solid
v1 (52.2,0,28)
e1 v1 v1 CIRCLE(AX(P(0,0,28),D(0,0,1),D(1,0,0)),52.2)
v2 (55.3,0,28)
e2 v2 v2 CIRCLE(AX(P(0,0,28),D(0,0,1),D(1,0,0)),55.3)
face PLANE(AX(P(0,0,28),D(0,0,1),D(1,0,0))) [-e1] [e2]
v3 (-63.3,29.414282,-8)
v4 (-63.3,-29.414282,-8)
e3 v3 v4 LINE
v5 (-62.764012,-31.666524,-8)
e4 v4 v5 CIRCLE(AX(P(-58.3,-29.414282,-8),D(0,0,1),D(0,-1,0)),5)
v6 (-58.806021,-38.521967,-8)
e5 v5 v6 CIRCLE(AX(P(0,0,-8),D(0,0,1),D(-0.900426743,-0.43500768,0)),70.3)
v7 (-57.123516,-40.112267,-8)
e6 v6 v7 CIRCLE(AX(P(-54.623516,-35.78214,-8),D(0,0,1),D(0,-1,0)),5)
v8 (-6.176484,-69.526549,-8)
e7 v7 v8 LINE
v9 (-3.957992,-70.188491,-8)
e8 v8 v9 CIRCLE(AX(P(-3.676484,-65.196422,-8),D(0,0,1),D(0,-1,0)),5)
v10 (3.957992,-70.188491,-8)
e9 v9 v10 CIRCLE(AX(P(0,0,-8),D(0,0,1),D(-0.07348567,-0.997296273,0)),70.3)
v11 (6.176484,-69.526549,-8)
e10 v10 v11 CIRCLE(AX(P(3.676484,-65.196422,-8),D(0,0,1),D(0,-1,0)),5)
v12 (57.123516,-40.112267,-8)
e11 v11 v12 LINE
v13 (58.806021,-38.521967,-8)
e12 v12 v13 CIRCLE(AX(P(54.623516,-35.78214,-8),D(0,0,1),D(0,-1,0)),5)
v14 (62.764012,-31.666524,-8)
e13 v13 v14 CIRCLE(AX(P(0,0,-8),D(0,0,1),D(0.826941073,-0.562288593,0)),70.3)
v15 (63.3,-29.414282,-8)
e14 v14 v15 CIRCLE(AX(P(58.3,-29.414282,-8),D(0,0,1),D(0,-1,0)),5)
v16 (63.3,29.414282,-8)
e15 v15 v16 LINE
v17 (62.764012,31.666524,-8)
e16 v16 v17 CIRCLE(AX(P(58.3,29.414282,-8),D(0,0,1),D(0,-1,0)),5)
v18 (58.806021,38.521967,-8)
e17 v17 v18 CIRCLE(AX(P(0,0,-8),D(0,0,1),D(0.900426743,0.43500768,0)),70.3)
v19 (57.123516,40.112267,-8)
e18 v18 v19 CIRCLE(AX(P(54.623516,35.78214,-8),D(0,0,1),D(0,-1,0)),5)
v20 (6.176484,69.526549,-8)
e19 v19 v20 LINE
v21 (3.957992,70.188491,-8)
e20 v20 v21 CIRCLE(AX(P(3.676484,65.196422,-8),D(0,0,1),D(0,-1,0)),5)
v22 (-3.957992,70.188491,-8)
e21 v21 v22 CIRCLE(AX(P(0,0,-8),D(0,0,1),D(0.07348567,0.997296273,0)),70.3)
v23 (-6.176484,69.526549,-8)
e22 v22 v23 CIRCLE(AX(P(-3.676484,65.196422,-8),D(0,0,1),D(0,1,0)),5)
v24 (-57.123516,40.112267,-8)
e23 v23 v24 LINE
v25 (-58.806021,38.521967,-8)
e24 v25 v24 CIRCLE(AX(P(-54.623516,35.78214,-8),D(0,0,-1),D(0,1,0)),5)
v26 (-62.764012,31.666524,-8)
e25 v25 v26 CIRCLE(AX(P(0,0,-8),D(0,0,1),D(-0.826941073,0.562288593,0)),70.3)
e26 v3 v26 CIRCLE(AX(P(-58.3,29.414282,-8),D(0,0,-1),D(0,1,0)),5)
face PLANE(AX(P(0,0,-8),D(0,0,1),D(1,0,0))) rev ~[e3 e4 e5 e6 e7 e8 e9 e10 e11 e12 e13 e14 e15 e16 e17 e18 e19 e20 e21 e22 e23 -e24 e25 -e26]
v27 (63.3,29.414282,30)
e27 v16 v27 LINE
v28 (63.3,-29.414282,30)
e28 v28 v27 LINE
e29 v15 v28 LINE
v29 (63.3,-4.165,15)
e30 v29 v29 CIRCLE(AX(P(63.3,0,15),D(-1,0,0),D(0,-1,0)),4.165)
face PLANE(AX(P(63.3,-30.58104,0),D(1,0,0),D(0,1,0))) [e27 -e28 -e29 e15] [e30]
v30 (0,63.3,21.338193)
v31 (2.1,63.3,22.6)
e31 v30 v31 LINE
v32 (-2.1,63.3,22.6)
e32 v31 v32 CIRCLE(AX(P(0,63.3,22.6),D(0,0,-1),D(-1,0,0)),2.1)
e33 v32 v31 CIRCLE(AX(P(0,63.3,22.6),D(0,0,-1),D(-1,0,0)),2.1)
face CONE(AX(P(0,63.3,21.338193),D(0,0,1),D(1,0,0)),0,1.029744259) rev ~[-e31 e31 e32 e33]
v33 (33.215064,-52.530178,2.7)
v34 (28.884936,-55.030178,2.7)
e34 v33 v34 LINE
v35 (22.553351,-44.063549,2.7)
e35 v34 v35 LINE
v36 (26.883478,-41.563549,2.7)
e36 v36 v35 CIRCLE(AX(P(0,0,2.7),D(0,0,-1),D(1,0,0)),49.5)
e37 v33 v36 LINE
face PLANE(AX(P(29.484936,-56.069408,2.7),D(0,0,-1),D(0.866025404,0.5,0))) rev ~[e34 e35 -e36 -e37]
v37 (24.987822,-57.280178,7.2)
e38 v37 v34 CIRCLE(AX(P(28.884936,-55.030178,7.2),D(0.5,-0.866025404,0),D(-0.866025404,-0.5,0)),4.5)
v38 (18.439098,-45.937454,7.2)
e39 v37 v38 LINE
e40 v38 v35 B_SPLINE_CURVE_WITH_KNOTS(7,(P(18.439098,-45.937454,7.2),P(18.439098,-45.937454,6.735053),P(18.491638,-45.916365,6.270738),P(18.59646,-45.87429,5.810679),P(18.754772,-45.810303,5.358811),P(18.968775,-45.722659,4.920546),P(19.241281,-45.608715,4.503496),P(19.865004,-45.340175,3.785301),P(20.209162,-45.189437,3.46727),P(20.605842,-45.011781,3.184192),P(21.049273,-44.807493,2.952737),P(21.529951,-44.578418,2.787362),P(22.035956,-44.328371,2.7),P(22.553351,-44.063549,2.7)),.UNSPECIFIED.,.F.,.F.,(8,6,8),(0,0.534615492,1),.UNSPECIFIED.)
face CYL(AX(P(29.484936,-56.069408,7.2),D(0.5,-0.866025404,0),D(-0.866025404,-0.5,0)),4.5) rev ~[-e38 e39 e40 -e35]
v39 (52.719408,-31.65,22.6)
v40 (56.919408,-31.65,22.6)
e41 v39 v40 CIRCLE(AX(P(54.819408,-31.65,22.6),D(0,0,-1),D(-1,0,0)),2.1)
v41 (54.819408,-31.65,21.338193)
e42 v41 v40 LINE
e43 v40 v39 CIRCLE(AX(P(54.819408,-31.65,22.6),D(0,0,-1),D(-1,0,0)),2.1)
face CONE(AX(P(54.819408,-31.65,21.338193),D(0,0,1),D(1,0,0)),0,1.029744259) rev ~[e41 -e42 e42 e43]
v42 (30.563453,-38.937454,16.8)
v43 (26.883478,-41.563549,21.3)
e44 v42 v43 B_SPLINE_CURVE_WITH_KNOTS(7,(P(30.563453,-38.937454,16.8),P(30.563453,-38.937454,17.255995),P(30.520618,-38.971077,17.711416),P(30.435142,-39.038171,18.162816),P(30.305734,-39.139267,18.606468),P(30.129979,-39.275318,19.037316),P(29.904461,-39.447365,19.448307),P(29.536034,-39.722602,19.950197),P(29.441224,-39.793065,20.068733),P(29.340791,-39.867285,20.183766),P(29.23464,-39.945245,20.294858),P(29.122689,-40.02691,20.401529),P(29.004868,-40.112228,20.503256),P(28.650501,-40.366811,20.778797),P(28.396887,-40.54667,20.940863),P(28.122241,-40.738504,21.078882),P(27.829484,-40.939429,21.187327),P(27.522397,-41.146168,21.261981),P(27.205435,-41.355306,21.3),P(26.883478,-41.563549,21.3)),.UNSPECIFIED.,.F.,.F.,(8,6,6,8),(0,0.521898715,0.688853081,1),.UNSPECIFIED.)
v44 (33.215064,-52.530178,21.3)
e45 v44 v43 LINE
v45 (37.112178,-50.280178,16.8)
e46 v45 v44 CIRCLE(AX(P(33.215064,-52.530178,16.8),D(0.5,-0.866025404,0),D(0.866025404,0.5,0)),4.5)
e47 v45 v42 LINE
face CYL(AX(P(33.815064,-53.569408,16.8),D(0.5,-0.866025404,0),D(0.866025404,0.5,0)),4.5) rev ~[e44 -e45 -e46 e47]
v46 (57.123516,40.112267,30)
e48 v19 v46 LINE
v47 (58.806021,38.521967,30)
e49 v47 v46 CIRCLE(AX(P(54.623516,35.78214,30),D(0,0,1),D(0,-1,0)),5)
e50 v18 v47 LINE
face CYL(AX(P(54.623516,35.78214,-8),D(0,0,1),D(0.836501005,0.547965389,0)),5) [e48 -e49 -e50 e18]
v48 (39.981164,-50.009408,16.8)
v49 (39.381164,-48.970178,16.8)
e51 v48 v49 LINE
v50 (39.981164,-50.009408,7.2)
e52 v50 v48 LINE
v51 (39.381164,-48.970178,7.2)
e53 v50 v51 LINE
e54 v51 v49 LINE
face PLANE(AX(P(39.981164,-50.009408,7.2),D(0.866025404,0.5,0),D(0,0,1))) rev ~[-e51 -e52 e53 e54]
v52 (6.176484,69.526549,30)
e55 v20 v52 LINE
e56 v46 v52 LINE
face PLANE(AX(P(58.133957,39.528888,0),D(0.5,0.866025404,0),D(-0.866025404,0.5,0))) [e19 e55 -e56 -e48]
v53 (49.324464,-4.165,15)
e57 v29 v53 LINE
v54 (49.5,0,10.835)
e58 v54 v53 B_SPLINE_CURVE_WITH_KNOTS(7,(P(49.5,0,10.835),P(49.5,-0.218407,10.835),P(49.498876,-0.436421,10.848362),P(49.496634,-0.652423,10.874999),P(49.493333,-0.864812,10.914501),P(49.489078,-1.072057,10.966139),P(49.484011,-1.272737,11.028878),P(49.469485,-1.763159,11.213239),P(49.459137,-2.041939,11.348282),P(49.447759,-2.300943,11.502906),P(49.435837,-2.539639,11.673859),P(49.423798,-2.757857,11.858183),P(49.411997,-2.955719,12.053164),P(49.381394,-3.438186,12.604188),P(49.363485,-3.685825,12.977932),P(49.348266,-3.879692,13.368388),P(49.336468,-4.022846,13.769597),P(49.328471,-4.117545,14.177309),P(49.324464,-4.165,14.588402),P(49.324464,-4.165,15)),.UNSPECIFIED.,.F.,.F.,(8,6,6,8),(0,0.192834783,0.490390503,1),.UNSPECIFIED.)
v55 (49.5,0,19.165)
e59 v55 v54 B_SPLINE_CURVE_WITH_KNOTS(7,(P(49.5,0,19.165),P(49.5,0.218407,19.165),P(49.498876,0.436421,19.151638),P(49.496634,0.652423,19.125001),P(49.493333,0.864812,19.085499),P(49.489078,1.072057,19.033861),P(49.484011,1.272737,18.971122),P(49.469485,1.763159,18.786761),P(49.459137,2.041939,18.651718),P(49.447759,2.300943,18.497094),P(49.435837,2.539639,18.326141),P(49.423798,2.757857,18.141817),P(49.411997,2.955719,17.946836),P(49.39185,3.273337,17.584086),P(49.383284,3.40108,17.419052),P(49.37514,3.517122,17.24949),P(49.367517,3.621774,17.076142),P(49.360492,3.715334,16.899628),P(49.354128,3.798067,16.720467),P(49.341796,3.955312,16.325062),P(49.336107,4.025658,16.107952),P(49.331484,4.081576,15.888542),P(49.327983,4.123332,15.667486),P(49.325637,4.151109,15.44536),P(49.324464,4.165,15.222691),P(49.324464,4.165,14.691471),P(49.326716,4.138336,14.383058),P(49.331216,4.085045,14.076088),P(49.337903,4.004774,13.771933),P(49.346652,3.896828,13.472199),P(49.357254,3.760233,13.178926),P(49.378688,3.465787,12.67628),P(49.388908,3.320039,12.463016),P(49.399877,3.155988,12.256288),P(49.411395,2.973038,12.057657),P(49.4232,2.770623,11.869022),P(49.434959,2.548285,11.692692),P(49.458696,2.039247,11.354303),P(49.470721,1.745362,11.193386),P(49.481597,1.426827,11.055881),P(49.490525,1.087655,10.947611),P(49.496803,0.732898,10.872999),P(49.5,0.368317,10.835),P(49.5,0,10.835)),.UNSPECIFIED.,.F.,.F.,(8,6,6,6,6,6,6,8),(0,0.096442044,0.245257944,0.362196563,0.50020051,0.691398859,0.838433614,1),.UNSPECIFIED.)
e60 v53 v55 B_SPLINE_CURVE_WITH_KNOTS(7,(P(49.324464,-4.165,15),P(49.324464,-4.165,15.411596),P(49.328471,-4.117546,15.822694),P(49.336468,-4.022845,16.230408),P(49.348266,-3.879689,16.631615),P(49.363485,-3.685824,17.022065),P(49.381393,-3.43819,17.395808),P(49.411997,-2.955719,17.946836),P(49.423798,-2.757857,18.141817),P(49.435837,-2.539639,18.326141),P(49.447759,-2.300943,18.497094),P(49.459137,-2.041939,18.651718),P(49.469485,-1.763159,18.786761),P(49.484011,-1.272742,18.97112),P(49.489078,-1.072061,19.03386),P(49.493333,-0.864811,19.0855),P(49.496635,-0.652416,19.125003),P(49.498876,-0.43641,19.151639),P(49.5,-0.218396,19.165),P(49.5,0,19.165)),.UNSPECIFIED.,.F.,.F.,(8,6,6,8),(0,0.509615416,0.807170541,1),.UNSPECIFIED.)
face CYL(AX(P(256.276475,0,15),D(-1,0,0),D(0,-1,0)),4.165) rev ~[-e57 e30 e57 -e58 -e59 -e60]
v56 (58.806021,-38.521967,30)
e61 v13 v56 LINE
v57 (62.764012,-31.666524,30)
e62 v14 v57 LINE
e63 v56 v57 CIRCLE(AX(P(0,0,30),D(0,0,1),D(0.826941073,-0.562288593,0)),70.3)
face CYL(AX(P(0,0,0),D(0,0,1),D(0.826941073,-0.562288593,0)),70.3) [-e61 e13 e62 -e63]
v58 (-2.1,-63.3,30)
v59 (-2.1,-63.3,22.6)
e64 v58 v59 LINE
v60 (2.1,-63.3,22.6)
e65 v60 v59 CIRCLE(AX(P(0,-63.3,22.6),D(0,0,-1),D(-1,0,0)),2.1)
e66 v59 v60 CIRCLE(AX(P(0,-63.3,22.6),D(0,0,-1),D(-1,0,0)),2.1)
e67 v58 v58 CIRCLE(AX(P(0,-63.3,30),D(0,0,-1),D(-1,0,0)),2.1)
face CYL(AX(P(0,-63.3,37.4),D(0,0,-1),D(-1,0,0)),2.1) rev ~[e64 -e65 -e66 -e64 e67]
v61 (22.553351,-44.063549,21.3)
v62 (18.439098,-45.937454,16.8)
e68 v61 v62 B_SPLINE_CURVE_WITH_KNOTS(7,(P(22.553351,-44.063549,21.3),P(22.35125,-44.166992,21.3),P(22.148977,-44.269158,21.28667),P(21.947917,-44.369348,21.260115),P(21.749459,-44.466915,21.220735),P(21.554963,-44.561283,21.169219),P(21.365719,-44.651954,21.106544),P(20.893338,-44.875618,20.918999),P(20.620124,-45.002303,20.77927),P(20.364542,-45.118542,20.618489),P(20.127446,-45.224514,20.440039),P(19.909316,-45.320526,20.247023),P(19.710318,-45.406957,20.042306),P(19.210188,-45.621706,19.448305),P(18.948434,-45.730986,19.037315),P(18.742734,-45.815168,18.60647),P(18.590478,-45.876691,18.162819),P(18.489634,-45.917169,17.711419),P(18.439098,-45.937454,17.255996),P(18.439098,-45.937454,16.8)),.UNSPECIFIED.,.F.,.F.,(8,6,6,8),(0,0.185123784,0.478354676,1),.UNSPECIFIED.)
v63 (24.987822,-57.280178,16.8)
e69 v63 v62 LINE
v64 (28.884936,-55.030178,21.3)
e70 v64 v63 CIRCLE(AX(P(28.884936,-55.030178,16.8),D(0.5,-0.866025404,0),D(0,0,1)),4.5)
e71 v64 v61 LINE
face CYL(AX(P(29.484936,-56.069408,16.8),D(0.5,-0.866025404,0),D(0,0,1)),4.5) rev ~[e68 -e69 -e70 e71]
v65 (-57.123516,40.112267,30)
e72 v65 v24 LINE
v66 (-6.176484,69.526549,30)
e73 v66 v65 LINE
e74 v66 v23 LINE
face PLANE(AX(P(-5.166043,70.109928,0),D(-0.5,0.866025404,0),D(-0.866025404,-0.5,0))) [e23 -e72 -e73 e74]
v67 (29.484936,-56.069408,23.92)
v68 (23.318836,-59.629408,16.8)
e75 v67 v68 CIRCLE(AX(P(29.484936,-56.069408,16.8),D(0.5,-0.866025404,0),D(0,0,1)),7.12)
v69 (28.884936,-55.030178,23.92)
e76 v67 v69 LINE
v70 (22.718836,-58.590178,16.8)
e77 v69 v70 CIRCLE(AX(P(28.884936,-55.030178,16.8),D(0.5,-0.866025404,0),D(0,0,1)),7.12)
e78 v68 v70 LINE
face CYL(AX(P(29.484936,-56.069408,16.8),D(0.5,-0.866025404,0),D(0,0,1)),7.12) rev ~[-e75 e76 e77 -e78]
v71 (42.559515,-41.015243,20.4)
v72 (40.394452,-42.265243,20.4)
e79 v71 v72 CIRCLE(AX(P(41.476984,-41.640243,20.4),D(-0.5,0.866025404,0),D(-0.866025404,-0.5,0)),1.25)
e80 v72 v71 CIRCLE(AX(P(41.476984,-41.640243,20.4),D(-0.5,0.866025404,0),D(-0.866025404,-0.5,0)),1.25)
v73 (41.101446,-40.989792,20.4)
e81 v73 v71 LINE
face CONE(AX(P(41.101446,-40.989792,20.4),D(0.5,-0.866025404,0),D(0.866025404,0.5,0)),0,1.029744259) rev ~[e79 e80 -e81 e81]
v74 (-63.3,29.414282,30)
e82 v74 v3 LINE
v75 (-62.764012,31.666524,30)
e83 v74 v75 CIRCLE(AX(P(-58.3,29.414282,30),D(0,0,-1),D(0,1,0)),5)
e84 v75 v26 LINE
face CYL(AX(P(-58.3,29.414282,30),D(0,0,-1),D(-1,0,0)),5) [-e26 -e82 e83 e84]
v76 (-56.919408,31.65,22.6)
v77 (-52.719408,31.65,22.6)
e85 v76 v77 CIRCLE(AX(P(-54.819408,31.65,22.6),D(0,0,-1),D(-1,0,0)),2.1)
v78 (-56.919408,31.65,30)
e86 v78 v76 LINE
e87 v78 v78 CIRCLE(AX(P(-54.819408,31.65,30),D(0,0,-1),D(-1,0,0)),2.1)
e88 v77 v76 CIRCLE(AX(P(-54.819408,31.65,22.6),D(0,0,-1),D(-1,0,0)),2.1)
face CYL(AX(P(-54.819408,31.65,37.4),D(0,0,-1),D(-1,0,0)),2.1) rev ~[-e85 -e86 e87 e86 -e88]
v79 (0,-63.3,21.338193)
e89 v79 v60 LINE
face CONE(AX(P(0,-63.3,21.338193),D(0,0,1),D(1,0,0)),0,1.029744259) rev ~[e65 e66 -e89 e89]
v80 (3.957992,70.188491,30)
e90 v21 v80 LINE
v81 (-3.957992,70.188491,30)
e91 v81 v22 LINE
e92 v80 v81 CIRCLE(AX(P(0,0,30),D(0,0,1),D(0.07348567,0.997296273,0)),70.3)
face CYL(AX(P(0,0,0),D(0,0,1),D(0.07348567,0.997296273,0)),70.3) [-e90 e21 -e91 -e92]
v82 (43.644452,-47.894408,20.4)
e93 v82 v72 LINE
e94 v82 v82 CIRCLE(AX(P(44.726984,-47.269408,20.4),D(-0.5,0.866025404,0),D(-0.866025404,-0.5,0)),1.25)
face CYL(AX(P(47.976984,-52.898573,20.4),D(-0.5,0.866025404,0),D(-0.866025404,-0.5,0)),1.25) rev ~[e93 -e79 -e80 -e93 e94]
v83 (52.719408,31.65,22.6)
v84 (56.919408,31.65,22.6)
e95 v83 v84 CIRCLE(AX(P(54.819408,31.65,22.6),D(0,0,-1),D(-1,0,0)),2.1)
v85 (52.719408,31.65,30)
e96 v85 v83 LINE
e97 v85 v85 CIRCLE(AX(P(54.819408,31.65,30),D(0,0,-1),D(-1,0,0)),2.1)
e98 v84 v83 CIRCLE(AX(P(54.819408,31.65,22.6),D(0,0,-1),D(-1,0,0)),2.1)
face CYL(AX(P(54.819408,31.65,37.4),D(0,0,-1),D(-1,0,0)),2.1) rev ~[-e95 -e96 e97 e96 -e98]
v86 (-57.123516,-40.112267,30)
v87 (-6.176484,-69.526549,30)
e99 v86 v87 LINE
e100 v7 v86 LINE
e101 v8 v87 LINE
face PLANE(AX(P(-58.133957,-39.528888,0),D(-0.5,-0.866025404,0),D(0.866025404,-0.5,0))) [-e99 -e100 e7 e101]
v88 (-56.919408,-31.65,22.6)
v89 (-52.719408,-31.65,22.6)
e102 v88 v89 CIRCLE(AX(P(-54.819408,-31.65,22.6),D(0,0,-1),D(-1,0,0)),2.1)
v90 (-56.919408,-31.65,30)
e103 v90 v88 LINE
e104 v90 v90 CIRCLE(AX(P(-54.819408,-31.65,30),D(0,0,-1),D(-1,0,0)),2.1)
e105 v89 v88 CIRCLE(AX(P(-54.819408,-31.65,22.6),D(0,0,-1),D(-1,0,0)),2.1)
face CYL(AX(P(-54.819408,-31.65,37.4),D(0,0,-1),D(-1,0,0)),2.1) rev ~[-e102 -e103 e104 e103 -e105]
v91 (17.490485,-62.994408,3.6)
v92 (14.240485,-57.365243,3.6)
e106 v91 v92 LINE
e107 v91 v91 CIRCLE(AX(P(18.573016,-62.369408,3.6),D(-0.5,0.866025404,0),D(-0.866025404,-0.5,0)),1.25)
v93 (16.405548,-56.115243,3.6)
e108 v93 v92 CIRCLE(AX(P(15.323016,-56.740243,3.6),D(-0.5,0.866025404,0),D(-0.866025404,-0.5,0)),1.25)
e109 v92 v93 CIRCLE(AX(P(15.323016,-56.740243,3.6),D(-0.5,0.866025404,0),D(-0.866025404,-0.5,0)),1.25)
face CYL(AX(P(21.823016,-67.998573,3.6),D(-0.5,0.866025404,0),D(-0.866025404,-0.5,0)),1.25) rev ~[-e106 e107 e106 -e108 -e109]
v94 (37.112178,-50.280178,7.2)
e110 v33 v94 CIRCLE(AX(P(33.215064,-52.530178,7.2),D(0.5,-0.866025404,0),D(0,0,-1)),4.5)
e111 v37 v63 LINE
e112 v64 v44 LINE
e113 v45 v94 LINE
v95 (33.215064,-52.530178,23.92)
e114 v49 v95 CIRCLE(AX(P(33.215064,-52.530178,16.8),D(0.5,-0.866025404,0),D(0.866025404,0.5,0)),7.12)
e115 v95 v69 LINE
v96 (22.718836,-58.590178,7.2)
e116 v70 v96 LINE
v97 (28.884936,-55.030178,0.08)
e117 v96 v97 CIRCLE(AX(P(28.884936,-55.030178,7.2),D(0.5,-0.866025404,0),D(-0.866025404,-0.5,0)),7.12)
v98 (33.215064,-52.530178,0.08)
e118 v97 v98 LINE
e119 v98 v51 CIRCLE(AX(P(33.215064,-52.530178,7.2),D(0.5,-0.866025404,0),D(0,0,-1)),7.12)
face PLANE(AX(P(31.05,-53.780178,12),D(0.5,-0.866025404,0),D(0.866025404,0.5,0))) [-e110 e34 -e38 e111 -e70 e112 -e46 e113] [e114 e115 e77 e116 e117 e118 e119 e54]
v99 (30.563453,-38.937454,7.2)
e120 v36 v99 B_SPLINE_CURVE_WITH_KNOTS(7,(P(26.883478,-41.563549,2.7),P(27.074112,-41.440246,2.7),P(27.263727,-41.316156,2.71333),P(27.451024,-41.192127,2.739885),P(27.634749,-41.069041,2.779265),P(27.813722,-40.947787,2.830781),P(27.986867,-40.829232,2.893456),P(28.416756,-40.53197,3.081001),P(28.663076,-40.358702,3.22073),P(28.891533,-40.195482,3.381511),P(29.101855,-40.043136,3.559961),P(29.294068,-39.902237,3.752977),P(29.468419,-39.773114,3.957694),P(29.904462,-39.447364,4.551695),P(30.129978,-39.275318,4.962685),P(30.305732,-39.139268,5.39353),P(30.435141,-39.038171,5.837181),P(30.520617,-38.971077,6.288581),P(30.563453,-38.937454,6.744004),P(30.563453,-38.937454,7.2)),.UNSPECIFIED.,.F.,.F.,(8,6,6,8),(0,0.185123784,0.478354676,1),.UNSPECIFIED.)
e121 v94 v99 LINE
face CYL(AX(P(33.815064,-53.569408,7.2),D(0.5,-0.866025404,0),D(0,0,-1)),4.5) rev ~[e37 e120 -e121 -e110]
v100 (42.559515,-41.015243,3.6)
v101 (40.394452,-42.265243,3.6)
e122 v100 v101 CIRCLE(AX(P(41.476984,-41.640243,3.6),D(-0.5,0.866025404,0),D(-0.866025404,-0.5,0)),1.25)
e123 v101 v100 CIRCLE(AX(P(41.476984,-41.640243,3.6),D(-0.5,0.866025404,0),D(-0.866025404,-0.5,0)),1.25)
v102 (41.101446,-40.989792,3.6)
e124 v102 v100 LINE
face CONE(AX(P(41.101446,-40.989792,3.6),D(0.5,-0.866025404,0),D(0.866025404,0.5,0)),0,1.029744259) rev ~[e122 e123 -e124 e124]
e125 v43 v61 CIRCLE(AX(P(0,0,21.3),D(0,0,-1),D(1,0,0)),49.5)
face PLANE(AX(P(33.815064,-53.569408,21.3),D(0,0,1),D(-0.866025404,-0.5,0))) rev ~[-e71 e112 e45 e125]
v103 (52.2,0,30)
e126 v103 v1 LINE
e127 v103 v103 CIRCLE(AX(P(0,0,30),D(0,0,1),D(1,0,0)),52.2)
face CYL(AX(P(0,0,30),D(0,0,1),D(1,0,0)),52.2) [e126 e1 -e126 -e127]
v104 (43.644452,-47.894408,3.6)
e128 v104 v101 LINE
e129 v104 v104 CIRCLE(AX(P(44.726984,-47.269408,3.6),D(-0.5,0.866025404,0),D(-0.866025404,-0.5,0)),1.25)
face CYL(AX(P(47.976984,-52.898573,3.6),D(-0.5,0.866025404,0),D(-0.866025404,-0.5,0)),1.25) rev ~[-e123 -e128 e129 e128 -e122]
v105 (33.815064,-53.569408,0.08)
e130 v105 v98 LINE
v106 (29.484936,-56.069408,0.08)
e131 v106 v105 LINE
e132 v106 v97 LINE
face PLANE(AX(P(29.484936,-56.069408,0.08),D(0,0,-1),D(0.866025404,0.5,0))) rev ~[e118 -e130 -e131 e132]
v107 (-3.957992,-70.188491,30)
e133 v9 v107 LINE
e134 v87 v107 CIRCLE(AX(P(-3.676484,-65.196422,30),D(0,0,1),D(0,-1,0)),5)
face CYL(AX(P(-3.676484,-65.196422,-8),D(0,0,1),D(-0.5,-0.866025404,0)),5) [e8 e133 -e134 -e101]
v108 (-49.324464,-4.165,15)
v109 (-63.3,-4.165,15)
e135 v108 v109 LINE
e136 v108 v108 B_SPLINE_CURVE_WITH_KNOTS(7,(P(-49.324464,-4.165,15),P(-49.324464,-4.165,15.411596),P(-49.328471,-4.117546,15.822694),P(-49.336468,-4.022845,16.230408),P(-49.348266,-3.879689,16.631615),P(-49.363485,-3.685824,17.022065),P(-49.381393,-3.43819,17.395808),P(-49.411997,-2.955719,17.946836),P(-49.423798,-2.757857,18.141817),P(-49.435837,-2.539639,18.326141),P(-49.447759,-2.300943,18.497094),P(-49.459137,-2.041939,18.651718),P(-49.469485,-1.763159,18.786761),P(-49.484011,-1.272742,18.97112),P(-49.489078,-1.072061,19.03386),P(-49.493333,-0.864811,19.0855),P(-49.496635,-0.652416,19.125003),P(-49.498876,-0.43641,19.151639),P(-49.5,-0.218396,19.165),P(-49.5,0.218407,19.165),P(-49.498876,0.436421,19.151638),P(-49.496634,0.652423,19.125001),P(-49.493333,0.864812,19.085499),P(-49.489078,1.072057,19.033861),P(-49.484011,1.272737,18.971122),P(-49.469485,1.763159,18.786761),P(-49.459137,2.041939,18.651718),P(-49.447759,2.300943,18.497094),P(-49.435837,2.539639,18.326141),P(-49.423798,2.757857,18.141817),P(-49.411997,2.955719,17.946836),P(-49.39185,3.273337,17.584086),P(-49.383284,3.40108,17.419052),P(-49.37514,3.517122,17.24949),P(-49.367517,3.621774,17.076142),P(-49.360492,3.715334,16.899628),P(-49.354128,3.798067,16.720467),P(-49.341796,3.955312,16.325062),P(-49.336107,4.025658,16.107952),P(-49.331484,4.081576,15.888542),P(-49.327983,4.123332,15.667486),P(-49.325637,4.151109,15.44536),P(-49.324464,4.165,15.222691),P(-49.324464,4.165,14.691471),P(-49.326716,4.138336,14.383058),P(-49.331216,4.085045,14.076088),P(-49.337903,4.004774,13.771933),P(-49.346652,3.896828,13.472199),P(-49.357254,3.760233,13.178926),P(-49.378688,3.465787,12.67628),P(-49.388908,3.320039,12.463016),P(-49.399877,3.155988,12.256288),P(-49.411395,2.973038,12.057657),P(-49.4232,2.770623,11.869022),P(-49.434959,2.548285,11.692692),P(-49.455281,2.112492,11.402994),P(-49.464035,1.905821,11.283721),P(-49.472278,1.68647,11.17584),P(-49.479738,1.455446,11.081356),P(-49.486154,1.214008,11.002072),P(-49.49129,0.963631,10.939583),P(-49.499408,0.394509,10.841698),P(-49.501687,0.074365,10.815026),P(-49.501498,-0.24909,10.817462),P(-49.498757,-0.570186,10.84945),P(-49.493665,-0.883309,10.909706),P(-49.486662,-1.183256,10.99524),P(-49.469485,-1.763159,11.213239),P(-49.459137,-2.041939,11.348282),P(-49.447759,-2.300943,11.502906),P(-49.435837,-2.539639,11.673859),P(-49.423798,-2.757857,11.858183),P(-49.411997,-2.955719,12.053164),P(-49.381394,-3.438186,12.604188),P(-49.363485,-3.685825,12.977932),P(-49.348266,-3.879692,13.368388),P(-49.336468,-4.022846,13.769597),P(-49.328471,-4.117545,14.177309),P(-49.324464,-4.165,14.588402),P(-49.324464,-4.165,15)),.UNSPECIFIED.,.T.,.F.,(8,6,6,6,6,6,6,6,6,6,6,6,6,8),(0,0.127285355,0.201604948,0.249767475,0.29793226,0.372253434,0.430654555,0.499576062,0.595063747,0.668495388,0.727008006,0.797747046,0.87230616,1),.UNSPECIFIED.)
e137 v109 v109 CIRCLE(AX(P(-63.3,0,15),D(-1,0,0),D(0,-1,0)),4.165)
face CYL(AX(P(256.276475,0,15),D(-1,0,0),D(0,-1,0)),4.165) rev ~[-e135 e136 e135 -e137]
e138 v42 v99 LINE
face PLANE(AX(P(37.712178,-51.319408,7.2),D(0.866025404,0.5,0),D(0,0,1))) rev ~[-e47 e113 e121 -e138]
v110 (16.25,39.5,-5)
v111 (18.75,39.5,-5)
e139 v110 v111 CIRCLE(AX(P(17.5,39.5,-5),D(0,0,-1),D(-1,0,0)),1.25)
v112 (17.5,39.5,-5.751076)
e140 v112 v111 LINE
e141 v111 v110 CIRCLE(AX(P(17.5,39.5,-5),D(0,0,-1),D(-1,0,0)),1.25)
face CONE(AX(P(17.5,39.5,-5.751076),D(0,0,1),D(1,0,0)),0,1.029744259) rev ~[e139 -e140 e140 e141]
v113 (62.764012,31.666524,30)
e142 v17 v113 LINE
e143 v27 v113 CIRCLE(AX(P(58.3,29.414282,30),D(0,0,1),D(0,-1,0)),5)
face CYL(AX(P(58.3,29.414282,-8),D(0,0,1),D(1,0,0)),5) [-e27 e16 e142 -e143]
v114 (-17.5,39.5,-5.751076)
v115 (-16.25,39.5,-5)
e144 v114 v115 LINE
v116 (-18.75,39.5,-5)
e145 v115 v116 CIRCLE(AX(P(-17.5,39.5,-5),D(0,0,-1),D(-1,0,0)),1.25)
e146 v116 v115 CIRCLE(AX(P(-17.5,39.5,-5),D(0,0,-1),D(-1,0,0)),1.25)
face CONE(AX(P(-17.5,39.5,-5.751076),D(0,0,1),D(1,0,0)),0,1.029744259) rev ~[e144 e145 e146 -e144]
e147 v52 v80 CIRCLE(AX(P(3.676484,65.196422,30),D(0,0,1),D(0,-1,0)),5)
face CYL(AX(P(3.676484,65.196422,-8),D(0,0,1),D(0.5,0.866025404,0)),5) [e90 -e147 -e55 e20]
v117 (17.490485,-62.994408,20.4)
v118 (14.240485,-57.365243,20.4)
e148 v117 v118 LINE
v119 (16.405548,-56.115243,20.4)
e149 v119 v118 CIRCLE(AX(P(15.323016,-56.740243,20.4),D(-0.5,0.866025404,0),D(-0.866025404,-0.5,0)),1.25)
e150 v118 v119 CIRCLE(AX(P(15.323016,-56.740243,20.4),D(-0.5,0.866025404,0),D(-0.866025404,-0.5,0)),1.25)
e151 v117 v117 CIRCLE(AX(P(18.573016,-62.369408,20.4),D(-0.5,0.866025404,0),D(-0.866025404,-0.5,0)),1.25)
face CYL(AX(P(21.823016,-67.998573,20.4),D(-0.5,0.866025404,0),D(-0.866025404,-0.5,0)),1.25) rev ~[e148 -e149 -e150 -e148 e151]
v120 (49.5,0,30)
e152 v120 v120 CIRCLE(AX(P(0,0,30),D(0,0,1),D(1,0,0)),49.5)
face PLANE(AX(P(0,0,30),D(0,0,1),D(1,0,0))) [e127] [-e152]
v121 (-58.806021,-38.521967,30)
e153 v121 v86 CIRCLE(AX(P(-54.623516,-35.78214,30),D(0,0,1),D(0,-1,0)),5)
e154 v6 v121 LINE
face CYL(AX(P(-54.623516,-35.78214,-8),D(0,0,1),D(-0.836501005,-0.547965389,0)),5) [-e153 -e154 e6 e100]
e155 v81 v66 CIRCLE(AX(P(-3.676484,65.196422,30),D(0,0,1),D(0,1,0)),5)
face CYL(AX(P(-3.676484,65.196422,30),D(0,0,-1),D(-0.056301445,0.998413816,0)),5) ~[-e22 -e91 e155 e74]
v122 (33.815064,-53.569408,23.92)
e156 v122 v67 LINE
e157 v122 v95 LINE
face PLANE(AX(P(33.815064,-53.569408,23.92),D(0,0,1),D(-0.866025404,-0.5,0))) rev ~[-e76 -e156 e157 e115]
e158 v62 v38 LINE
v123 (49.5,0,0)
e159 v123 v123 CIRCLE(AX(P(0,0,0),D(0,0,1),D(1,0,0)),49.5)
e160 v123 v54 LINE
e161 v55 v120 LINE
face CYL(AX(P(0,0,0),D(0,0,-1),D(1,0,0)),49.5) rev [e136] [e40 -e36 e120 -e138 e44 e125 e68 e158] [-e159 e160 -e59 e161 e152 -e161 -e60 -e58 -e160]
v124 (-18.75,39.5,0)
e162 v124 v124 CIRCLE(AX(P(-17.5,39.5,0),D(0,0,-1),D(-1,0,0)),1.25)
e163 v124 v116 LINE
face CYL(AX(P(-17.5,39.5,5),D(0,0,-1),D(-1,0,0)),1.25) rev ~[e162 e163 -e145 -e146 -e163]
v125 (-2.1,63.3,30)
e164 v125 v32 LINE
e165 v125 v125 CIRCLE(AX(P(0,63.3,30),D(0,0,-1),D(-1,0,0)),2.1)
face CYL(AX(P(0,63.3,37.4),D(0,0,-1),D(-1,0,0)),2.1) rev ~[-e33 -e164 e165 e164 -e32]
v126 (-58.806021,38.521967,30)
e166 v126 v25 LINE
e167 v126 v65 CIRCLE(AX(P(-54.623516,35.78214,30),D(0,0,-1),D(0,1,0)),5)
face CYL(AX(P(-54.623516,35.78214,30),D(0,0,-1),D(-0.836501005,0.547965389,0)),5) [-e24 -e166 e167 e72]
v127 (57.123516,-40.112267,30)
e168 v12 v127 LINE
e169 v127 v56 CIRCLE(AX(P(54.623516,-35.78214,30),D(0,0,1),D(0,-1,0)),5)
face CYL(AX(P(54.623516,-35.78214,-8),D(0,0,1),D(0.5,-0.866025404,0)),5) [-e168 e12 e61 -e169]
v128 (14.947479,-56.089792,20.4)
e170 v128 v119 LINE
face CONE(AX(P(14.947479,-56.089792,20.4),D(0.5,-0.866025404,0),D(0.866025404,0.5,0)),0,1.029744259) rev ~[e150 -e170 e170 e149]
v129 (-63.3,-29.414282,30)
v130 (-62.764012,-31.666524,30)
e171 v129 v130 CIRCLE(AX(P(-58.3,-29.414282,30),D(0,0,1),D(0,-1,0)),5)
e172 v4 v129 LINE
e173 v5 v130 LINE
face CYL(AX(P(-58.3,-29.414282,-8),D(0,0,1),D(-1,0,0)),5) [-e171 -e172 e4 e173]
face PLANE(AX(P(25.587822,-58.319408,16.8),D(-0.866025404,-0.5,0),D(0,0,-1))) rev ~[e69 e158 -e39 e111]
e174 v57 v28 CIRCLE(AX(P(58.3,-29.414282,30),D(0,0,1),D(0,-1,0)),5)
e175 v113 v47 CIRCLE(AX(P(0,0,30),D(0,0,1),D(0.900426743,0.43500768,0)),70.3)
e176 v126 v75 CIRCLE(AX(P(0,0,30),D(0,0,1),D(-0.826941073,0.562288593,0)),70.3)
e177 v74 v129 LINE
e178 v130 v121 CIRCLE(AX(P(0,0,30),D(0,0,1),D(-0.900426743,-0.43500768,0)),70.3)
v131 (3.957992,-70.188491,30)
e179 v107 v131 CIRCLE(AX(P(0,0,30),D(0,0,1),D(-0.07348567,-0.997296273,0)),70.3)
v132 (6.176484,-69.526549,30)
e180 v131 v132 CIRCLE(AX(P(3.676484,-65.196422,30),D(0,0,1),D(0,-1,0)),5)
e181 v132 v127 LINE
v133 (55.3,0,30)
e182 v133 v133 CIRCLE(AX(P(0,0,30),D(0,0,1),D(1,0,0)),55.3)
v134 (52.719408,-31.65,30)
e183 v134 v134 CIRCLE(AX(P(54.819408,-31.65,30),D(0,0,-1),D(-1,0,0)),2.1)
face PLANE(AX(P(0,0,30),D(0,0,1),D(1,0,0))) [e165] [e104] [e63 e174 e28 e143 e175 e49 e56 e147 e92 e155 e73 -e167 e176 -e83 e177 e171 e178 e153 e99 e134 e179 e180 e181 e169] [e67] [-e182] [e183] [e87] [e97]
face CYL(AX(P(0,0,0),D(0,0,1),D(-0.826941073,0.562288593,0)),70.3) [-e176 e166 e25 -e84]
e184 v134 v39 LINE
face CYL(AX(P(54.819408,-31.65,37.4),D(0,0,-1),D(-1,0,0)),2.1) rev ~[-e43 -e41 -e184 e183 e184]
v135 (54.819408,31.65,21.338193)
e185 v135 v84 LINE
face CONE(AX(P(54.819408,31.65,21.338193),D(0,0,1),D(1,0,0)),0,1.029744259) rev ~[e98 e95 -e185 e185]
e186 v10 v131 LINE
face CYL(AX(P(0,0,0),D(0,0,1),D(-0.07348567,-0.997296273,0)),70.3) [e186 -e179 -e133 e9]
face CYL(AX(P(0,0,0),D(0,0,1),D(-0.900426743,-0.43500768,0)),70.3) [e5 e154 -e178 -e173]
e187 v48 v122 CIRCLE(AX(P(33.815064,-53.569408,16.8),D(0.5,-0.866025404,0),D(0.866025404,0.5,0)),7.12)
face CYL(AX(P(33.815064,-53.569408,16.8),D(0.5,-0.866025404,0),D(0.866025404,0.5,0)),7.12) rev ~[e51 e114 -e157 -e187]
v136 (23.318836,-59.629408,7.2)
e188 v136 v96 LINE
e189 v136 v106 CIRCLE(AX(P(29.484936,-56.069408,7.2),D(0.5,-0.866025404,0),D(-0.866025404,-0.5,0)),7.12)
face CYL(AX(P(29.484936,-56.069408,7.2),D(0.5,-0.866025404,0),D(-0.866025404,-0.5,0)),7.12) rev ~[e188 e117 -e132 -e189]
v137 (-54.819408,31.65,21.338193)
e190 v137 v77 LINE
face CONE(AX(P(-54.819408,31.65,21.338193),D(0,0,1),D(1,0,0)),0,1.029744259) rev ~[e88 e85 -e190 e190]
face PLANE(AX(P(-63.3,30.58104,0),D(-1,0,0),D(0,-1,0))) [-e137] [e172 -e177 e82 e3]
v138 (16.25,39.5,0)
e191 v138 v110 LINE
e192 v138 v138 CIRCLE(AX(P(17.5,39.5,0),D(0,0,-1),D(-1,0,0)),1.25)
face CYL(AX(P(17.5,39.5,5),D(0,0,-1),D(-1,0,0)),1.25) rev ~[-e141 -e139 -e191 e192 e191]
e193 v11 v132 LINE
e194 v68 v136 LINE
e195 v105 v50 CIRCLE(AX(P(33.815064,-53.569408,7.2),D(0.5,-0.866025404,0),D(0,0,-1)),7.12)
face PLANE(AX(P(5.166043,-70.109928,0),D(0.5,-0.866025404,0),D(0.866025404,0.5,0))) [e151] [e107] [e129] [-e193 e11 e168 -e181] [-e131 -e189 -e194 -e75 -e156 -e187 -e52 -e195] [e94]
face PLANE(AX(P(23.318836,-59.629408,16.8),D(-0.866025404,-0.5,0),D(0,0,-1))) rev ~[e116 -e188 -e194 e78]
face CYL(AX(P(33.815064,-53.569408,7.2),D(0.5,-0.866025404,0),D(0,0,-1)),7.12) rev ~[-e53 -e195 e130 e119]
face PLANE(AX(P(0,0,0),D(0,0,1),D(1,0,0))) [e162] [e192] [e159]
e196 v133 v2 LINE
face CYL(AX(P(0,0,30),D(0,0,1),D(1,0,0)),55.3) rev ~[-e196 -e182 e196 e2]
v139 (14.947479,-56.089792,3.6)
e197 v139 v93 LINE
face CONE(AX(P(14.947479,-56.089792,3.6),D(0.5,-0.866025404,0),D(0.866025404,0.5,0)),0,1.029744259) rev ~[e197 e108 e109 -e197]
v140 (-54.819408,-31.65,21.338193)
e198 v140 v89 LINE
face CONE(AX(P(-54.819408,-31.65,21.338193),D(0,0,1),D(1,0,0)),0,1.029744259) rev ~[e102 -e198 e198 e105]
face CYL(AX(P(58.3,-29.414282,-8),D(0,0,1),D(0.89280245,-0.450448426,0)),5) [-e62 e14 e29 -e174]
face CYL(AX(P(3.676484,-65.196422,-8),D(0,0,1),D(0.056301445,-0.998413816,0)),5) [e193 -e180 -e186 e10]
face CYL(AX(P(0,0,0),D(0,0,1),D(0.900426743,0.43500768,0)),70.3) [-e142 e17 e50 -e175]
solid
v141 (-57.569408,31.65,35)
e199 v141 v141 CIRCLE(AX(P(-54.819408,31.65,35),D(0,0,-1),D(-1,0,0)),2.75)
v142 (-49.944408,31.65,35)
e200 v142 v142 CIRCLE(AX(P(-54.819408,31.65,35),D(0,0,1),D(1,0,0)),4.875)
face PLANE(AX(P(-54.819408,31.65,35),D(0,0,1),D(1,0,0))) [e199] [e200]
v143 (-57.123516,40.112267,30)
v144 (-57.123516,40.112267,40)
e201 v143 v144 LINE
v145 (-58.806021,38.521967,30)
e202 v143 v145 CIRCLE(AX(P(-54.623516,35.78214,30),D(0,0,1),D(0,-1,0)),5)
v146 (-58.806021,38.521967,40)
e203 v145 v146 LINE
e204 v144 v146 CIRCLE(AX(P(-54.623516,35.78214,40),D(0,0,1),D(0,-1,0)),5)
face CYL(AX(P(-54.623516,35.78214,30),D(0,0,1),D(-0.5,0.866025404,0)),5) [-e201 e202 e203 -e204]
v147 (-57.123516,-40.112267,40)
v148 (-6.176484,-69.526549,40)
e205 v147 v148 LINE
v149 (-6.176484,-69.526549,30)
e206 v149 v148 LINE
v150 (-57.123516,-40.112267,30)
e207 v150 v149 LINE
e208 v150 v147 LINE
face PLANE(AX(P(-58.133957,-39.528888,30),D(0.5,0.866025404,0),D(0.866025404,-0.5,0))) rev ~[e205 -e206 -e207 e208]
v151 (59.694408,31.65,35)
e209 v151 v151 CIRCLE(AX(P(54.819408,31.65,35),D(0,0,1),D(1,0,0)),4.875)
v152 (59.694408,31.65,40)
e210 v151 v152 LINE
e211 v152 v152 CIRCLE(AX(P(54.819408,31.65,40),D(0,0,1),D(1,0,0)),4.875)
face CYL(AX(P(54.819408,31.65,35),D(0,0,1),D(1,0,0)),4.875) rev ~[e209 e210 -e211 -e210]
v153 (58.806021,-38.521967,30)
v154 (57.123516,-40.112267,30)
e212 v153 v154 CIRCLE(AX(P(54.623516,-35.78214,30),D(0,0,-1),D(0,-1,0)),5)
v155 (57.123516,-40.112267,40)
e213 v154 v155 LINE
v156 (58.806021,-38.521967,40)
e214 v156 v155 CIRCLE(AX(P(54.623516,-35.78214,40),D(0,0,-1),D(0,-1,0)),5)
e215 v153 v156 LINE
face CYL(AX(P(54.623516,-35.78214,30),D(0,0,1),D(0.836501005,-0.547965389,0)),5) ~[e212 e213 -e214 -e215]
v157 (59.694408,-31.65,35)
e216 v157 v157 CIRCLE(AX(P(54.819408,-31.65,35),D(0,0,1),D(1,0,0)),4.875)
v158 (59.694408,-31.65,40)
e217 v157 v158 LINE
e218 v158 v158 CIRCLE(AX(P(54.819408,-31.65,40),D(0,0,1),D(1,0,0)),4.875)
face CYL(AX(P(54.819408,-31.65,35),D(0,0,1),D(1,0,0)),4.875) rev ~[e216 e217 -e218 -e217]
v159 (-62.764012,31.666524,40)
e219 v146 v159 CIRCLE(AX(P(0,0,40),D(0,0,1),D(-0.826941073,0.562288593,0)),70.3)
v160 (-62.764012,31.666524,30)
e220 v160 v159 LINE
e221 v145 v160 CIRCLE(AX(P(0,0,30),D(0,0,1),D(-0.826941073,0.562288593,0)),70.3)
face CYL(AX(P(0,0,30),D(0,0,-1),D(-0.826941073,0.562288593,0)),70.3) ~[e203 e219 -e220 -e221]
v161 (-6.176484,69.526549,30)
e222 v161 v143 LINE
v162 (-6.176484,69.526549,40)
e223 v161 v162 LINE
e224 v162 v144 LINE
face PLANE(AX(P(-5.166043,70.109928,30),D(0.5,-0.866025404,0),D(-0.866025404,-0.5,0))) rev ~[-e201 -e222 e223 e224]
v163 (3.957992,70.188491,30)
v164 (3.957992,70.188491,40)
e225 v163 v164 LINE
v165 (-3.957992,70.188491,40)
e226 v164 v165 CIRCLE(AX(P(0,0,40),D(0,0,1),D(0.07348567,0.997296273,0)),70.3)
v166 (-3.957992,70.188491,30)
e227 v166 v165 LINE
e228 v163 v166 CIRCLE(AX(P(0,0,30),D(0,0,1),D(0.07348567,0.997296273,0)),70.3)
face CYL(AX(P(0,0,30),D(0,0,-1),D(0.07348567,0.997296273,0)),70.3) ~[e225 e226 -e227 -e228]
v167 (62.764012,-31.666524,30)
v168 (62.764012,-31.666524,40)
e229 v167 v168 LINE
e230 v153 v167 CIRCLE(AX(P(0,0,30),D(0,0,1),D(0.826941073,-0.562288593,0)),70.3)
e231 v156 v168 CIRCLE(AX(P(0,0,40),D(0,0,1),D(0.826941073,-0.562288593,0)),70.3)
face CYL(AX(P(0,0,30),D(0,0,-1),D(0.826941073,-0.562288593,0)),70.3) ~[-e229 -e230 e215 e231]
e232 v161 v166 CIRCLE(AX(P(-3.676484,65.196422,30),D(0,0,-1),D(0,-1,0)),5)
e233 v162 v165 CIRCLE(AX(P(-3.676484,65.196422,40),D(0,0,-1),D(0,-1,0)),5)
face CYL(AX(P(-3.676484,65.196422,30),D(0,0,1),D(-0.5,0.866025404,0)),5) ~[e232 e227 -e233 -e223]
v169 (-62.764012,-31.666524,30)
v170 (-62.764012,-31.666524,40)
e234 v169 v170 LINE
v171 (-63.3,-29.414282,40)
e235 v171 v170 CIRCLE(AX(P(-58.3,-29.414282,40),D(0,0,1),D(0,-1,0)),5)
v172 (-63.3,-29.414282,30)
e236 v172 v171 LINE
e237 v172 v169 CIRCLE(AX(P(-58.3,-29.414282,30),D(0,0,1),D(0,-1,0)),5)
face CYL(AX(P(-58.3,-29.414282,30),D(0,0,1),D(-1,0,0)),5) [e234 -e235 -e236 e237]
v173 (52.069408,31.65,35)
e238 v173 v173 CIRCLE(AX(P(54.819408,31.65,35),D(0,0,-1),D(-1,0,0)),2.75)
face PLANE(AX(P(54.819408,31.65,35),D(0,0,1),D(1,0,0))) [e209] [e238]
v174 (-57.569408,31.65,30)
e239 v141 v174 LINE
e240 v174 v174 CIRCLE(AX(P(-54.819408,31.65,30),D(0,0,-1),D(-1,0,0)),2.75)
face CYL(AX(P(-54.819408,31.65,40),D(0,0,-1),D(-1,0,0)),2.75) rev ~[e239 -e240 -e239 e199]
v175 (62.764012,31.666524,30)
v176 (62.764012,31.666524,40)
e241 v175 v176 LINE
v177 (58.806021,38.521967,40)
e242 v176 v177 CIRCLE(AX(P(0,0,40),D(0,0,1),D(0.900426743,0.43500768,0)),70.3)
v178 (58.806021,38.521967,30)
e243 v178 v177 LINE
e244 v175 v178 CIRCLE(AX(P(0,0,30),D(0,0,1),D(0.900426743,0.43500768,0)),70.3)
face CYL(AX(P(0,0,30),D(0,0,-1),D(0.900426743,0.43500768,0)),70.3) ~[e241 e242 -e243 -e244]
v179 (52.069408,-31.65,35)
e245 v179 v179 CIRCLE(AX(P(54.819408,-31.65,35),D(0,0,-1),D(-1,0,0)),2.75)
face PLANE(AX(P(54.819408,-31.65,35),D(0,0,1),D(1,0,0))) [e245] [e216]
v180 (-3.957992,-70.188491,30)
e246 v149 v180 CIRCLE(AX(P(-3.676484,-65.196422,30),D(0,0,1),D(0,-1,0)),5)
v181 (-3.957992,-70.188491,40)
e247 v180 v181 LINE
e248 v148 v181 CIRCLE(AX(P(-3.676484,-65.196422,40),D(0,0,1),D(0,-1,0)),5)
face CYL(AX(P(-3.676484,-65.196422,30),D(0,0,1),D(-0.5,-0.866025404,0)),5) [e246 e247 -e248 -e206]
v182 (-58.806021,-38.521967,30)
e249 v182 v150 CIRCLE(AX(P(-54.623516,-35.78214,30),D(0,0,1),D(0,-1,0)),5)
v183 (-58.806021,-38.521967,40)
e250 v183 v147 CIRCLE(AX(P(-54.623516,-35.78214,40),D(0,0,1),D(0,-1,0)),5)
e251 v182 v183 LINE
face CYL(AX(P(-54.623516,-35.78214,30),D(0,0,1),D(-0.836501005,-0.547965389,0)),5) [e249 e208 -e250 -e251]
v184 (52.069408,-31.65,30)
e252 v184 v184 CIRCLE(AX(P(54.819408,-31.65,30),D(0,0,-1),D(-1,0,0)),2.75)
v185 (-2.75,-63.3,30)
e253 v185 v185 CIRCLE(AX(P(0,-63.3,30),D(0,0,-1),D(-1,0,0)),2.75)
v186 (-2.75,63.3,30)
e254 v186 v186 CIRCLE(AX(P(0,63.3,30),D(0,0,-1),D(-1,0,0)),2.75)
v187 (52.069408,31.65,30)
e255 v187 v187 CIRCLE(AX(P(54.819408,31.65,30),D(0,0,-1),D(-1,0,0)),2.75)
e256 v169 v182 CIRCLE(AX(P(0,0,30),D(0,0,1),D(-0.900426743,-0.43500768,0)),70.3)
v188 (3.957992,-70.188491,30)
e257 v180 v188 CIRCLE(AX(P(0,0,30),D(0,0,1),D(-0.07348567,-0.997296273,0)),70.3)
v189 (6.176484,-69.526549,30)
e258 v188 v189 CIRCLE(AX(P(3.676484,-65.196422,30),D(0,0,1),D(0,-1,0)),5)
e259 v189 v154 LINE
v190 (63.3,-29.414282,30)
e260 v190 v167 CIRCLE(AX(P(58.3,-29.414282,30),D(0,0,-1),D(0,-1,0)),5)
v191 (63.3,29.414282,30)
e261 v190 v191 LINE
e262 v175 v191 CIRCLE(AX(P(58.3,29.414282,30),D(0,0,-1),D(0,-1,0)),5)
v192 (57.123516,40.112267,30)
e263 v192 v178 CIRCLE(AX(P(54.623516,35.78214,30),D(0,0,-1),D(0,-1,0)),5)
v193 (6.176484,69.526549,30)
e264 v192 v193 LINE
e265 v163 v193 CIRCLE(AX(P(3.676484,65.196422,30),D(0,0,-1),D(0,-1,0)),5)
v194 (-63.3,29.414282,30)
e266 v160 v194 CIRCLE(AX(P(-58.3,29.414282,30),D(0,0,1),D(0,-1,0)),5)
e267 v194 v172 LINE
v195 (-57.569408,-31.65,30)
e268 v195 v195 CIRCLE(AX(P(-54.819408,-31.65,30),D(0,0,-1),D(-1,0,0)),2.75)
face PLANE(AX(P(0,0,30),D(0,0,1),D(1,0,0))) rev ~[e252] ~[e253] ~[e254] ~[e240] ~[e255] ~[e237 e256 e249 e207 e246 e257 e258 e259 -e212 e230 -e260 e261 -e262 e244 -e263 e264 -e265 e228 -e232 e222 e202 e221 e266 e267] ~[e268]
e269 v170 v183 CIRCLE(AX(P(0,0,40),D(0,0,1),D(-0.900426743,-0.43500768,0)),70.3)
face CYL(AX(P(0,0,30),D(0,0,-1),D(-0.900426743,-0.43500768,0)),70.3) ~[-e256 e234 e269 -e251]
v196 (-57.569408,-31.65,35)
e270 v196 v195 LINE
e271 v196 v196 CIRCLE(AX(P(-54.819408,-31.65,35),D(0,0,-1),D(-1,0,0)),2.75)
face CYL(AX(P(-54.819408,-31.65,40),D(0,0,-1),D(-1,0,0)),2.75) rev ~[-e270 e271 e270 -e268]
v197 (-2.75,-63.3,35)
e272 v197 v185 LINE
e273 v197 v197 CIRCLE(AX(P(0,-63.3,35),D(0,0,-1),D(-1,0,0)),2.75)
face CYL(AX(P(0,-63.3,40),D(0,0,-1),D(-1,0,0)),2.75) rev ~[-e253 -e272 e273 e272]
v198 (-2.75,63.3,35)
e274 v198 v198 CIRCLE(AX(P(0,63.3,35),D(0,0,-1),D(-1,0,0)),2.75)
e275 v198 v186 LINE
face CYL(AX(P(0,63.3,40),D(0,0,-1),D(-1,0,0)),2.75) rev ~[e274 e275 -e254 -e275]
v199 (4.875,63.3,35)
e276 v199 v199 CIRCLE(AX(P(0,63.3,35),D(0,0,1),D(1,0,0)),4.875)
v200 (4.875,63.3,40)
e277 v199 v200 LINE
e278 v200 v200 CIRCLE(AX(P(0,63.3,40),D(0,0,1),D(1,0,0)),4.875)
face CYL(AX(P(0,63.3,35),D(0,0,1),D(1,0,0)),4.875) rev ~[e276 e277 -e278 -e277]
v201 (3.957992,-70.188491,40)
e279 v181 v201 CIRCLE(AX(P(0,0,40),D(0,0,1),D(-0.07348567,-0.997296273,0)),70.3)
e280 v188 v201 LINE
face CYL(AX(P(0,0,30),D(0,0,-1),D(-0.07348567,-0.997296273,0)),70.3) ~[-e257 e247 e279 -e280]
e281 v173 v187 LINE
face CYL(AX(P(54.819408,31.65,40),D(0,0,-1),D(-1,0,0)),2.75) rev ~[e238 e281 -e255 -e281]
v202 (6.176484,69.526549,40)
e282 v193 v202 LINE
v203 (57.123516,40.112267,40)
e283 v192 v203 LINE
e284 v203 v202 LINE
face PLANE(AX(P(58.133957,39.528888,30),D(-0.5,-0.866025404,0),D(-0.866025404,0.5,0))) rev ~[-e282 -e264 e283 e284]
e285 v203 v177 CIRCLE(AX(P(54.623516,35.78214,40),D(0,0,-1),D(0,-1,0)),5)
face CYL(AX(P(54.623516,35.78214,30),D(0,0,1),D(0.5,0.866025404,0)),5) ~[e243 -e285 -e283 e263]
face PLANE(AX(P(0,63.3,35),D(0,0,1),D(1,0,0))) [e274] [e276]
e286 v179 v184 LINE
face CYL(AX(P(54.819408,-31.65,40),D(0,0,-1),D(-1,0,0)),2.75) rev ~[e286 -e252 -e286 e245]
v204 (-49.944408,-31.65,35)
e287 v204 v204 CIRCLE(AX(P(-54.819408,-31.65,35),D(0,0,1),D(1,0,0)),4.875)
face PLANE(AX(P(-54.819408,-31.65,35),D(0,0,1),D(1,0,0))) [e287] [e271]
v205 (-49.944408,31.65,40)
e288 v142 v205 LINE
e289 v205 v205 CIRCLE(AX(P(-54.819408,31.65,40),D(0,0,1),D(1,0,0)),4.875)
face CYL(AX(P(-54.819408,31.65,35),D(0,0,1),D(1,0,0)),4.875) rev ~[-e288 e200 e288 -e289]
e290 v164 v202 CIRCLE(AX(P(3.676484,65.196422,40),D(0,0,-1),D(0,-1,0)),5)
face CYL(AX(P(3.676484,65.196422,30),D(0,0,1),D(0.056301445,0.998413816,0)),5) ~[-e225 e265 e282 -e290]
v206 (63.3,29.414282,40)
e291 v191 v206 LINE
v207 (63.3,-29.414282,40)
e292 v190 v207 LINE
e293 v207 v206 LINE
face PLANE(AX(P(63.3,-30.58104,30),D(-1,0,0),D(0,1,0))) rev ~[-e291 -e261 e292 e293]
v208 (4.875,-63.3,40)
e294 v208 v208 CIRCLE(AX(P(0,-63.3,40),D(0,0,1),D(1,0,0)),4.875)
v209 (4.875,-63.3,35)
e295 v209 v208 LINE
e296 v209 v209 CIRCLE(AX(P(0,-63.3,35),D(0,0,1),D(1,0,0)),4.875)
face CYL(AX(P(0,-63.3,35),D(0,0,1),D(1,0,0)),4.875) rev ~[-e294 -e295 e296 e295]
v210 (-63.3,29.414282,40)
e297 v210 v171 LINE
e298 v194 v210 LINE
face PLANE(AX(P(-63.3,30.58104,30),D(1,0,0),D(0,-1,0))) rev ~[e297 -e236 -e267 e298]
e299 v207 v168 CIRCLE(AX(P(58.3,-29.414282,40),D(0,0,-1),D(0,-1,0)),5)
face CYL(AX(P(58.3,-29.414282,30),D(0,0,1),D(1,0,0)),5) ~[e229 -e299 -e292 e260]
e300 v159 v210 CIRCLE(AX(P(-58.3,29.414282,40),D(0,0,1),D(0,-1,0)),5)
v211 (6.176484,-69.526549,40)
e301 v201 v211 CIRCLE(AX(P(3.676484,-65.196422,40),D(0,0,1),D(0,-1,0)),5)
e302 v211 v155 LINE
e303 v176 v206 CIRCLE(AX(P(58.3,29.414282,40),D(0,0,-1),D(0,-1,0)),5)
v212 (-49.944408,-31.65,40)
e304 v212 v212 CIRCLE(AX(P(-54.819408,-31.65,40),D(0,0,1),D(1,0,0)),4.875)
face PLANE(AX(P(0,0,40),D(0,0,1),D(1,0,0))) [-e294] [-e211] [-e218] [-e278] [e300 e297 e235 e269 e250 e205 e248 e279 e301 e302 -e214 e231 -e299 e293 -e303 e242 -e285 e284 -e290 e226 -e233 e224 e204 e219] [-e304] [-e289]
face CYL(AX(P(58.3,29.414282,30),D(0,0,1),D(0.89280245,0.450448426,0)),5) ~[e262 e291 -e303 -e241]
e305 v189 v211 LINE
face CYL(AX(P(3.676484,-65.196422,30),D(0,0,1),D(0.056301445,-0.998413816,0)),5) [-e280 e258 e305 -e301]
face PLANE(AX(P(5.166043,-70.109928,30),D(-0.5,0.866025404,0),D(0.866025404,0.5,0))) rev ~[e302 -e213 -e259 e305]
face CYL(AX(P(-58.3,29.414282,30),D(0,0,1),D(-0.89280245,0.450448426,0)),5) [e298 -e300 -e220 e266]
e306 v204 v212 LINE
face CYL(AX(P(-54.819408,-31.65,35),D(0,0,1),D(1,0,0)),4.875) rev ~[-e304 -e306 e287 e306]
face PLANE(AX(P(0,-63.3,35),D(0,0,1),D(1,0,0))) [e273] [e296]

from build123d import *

# Parameters (mm, degrees)
F5_R            = 49.5
F6_DEPTH        = 30
F8_DEPTH        = 25
F11_DEPTH       = 8
F12_DEPTH       = 1.2
F13_D           = 2.5
F13_DEPTH       = 6.5
F13_TIP         = 0.7510757738
F14_D           = 8.33
F16_R           = 55.3
F16_R_2         = 52.2
F17_DEPTH       = 2
F19_D           = 4.2
F19_DEPTH       = 7.4
F19_TIP         = 1.2618073
F21_DEPTH       = 10
F23_D           = 5.5
F23_CBORE_D     = 9.75
F23_CBORE_DEPTH = 5
F24_R           = 5
F25_R           = 5
F26_D           = 2.5
F26_DEPTH       = 5
F26_TIP         = 0.7510757738


with BuildPart() as f6:
    # F5 (on Top) → F6 (new body)
    with BuildSketch(Plane.XY):
        with BuildLine():
            Line((-63.3, 30.5810398777), (-63.3, -30.5810398777))
            ThreePointArc((-63.3, -30.5810398777), (-60.881585886, -35.15), (-58.1339574082, -39.5288881207))
            Line((-58.1339574082, -39.5288881207), (-5.1660425918, -70.1099279984))
            ThreePointArc((-5.1660425918, -70.1099279984), (0, -70.3), (5.1660425918, -70.1099279984))
            Line((5.1660425918, -70.1099279984), (58.1339574082, -39.5288881207))
            ThreePointArc((58.1339574082, -39.5288881207), (60.881585886, -35.15), (63.3, -30.5810398777))
            Line((63.3, -30.5810398777), (63.3, 30.5810398777))
            ThreePointArc((63.3, 30.5810398777), (60.881585886, 35.15), (58.1339574082, 39.5288881207))
            Line((58.1339574082, 39.5288881207), (5.1660425918, 70.1099279984))
            ThreePointArc((5.1660425918, 70.1099279984), (0, 70.3), (-5.1660425918, 70.1099279984))
            Line((-5.1660425918, 70.1099279984), (-58.1339574082, 39.5288881207))
            ThreePointArc((-58.1339574082, 39.5288881207), (-60.881585886, 35.15), (-63.3, 30.5810398777))
        make_face()
        Circle(F5_R, mode=Mode.SUBTRACT)
    extrude(amount=F6_DEPTH)

    # F7 (on line) → F8 (cut)
    with BuildSketch(Plane(origin=(31.65, -54.8194080596, 0), x_dir=(0.8660254038, 0.5, 0), z_dir=(0.5, -0.8660254038, 0))):
        with BuildLine():
            Line((2.5, 21.3), (-2.5, 21.3))
            ThreePointArc((-2.5, 21.3), (-5.6819805153, 19.9819805153), (-7, 16.8))
            Line((-7, 16.8), (-7, 7.2))
            ThreePointArc((-7, 7.2), (-5.6819805153, 4.0180194847), (-2.5, 2.7))
            Line((-2.5, 2.7), (2.5, 2.7))
            ThreePointArc((2.5, 2.7), (5.6819805153, 4.0180194847), (7, 7.2))
            Line((7, 7.2), (7, 16.8))
            ThreePointArc((7, 16.8), (5.6819805153, 19.9819805153), (2.5, 21.3))
        make_face()
    extrude(amount=-F8_DEPTH, mode=Mode.SUBTRACT)

    # F10 (on Top) → F11 (join)
    with BuildSketch(Plane.XY):
        with BuildLine():
            Line((-63.3, 30.5810398777), (-63.3, -30.5810398777))
            ThreePointArc((-63.3, -30.5810398777), (-60.881585886, -35.15), (-58.1339574082, -39.5288881207))
            Line((-58.1339574082, -39.5288881207), (-5.1660425918, -70.1099279984))
            ThreePointArc((-5.1660425918, -70.1099279984), (0, -70.3), (5.1660425918, -70.1099279984))
            Line((5.1660425918, -70.1099279984), (58.1339574082, -39.5288881207))
            ThreePointArc((58.1339574082, -39.5288881207), (60.881585886, -35.15), (63.3, -30.5810398777))
            Line((63.3, -30.5810398777), (63.3, 30.5810398777))
            ThreePointArc((63.3, 30.5810398777), (60.881585886, 35.15), (58.1339574082, 39.5288881207))
            Line((58.1339574082, 39.5288881207), (5.1660425918, 70.1099279984))
            ThreePointArc((5.1660425918, 70.1099279984), (0, 70.3), (-5.1660425918, 70.1099279984))
            Line((-5.1660425918, 70.1099279984), (-58.1339574082, 39.5288881207))
            ThreePointArc((-58.1339574082, 39.5288881207), (-60.881585886, 35.15), (-63.3, 30.5810398777))
        make_face()
    extrude(amount=-F11_DEPTH)

    # F9 (on line) → F12 (cut)
    with BuildSketch(Plane(origin=(31.65, -54.8194080596, 0), x_dir=(0.8660254038, 0.5, 0), z_dir=(0.5, -0.8660254038, 0))):
        with BuildLine():
            Line((2.5, 23.92), (-2.5, 23.92))
            ThreePointArc((-2.5, 23.92), (-7.534600282, 21.834600282), (-9.62, 16.8))
            Line((-9.62, 16.8), (-9.62, 7.2))
            ThreePointArc((-9.62, 7.2), (-7.534600282, 2.165399718), (-2.5, 0.08))
            Line((-2.5, 0.08), (2.5, 0.08))
            ThreePointArc((2.5, 0.08), (7.534600282, 2.165399718), (9.62, 7.2))
            Line((9.62, 7.2), (9.62, 16.8))
            ThreePointArc((9.62, 16.8), (7.534600282, 21.834600282), (2.5, 23.92))
        make_face()
    extrude(amount=-F12_DEPTH, mode=Mode.SUBTRACT)

    # F13
    with Locations(Plane(origin=(31.65, -54.8194080596, 0), x_dir=(0.8660254038, 0.5, 0), z_dir=(0.5, -0.8660254038, 0))):
        with Locations((-15.1, 20.4), (-15.1, 3.6), (15.1, 3.6), (15.1, 20.4)):
            Hole(F13_D / 2, depth=F13_DEPTH)
            with Locations((0, 0, -(F13_DEPTH + F13_TIP / 2))):  # 118° drill point
                Cone(0, F13_D / 2, F13_TIP, mode=Mode.SUBTRACT)

    # F14 (through all)
    with Locations(Plane.YZ.offset(63.3)):
        with Locations((0, 15)):
            Hole(F14_D / 2)

    # F16 (on offset) → F17 (cut)
    with BuildSketch(Plane.XY.offset(30)):
        Circle(F16_R)
        Circle(F16_R_2, mode=Mode.SUBTRACT)
    extrude(amount=-F17_DEPTH, mode=Mode.SUBTRACT)

    # F19
    with Locations(Plane.XY.offset(30)):
        with Locations((-54.8194080596, -31.65), (0, -63.3), (54.8194080596, -31.65), (0, 63.3), (54.8194080596, 31.65), (-54.8194080596, 31.65)):
            Hole(F19_D / 2, depth=F19_DEPTH)
            with Locations((0, 0, -(F19_DEPTH + F19_TIP / 2))):  # 118° drill point
                Cone(0, F19_D / 2, F19_TIP, mode=Mode.SUBTRACT)

    # F25
    f25_edges = [f6.edges().sort_by_distance(p)[0] for p in [
        (5.166043, -70.109928, 11),
        (-5.166043, -70.109928, 11),
        (58.133957, -39.528888, 11),
        (63.3, -30.58104, 11),
        (63.3, 30.58104, 11),
        (58.133957, 39.528888, 11),
        (5.166043, 70.109928, 11),
        (-5.166043, 70.109928, 11),
        (-58.133957, 39.528888, 11),
        (-63.3, 30.58104, 11),
        (-63.3, -30.58104, 11),
        (-58.133957, -39.528888, 11),
    ]]
    fillet(f25_edges, radius=F25_R)

    # F26
    with Locations(Plane.XY):
        with Locations((-17.5, 39.5), (17.5, 39.5)):
            Hole(F26_D / 2, depth=F26_DEPTH)
            with Locations((0, 0, -(F26_DEPTH + F26_TIP / 2))):  # 118° drill point
                Cone(0, F26_D / 2, F26_TIP, mode=Mode.SUBTRACT)


with BuildPart() as f21:
    # F20 (on offset) → F21 (new body)
    with BuildSketch(Plane.XY.offset(30)):
        with BuildLine():
            Line((-5.1660425918, 70.1099279984), (-58.1339574082, 39.5288881207))
            ThreePointArc((-58.1339574082, 39.5288881207), (-60.881585886, 35.15), (-63.3, 30.5810398777))
            Line((-63.3, 30.5810398777), (-63.3, -30.5810398777))
            ThreePointArc((-63.3, -30.5810398777), (-60.881585886, -35.15), (-58.1339574082, -39.5288881207))
            Line((-58.1339574082, -39.5288881207), (-5.1660425918, -70.1099279984))
            ThreePointArc((-5.1660425918, -70.1099279984), (0, -70.3), (5.1660425918, -70.1099279984))
            Line((5.1660425918, -70.1099279984), (58.1339574082, -39.5288881207))
            ThreePointArc((58.1339574082, -39.5288881207), (60.881585886, -35.15), (63.3, -30.5810398777))
            Line((63.3, -30.5810398777), (63.3, 30.5810398777))
            ThreePointArc((63.3, 30.5810398777), (60.881585886, 35.15), (58.1339574082, 39.5288881207))
            Line((58.1339574082, 39.5288881207), (5.1660425918, 70.1099279984))
            ThreePointArc((5.1660425918, 70.1099279984), (0, 70.3), (-5.1660425918, 70.1099279984))
        make_face()
    extrude(amount=F21_DEPTH)

    # F23 (through all)
    with Locations(Plane.XY.offset(40)):
        with Locations((0, 63.3), (-54.8194080596, 31.65), (-54.8194080596, -31.65), (0, -63.3), (54.8194080596, -31.65), (54.8194080596, 31.65)):
            CounterBoreHole(F23_D / 2, F23_CBORE_D / 2, F23_CBORE_DEPTH)

    # F24
    f24_edges = [f21.edges().sort_by_distance(p)[0] for p in [
        (-58.133957, -39.528888, 35),
        (-63.3, -30.58104, 35),
        (5.166043, -70.109928, 35),
        (-5.166043, -70.109928, 35),
        (58.133957, -39.528888, 35),
        (63.3, -30.58104, 35),
        (63.3, 30.58104, 35),
        (58.133957, 39.528888, 35),
        (5.166043, 70.109928, 35),
        (-5.166043, 70.109928, 35),
        (-58.133957, 39.528888, 35),
        (-63.3, 30.58104, 35),
    ]]
    fillet(f24_edges, radius=F24_R)


solid = Compound([f6.part, f21.part])
